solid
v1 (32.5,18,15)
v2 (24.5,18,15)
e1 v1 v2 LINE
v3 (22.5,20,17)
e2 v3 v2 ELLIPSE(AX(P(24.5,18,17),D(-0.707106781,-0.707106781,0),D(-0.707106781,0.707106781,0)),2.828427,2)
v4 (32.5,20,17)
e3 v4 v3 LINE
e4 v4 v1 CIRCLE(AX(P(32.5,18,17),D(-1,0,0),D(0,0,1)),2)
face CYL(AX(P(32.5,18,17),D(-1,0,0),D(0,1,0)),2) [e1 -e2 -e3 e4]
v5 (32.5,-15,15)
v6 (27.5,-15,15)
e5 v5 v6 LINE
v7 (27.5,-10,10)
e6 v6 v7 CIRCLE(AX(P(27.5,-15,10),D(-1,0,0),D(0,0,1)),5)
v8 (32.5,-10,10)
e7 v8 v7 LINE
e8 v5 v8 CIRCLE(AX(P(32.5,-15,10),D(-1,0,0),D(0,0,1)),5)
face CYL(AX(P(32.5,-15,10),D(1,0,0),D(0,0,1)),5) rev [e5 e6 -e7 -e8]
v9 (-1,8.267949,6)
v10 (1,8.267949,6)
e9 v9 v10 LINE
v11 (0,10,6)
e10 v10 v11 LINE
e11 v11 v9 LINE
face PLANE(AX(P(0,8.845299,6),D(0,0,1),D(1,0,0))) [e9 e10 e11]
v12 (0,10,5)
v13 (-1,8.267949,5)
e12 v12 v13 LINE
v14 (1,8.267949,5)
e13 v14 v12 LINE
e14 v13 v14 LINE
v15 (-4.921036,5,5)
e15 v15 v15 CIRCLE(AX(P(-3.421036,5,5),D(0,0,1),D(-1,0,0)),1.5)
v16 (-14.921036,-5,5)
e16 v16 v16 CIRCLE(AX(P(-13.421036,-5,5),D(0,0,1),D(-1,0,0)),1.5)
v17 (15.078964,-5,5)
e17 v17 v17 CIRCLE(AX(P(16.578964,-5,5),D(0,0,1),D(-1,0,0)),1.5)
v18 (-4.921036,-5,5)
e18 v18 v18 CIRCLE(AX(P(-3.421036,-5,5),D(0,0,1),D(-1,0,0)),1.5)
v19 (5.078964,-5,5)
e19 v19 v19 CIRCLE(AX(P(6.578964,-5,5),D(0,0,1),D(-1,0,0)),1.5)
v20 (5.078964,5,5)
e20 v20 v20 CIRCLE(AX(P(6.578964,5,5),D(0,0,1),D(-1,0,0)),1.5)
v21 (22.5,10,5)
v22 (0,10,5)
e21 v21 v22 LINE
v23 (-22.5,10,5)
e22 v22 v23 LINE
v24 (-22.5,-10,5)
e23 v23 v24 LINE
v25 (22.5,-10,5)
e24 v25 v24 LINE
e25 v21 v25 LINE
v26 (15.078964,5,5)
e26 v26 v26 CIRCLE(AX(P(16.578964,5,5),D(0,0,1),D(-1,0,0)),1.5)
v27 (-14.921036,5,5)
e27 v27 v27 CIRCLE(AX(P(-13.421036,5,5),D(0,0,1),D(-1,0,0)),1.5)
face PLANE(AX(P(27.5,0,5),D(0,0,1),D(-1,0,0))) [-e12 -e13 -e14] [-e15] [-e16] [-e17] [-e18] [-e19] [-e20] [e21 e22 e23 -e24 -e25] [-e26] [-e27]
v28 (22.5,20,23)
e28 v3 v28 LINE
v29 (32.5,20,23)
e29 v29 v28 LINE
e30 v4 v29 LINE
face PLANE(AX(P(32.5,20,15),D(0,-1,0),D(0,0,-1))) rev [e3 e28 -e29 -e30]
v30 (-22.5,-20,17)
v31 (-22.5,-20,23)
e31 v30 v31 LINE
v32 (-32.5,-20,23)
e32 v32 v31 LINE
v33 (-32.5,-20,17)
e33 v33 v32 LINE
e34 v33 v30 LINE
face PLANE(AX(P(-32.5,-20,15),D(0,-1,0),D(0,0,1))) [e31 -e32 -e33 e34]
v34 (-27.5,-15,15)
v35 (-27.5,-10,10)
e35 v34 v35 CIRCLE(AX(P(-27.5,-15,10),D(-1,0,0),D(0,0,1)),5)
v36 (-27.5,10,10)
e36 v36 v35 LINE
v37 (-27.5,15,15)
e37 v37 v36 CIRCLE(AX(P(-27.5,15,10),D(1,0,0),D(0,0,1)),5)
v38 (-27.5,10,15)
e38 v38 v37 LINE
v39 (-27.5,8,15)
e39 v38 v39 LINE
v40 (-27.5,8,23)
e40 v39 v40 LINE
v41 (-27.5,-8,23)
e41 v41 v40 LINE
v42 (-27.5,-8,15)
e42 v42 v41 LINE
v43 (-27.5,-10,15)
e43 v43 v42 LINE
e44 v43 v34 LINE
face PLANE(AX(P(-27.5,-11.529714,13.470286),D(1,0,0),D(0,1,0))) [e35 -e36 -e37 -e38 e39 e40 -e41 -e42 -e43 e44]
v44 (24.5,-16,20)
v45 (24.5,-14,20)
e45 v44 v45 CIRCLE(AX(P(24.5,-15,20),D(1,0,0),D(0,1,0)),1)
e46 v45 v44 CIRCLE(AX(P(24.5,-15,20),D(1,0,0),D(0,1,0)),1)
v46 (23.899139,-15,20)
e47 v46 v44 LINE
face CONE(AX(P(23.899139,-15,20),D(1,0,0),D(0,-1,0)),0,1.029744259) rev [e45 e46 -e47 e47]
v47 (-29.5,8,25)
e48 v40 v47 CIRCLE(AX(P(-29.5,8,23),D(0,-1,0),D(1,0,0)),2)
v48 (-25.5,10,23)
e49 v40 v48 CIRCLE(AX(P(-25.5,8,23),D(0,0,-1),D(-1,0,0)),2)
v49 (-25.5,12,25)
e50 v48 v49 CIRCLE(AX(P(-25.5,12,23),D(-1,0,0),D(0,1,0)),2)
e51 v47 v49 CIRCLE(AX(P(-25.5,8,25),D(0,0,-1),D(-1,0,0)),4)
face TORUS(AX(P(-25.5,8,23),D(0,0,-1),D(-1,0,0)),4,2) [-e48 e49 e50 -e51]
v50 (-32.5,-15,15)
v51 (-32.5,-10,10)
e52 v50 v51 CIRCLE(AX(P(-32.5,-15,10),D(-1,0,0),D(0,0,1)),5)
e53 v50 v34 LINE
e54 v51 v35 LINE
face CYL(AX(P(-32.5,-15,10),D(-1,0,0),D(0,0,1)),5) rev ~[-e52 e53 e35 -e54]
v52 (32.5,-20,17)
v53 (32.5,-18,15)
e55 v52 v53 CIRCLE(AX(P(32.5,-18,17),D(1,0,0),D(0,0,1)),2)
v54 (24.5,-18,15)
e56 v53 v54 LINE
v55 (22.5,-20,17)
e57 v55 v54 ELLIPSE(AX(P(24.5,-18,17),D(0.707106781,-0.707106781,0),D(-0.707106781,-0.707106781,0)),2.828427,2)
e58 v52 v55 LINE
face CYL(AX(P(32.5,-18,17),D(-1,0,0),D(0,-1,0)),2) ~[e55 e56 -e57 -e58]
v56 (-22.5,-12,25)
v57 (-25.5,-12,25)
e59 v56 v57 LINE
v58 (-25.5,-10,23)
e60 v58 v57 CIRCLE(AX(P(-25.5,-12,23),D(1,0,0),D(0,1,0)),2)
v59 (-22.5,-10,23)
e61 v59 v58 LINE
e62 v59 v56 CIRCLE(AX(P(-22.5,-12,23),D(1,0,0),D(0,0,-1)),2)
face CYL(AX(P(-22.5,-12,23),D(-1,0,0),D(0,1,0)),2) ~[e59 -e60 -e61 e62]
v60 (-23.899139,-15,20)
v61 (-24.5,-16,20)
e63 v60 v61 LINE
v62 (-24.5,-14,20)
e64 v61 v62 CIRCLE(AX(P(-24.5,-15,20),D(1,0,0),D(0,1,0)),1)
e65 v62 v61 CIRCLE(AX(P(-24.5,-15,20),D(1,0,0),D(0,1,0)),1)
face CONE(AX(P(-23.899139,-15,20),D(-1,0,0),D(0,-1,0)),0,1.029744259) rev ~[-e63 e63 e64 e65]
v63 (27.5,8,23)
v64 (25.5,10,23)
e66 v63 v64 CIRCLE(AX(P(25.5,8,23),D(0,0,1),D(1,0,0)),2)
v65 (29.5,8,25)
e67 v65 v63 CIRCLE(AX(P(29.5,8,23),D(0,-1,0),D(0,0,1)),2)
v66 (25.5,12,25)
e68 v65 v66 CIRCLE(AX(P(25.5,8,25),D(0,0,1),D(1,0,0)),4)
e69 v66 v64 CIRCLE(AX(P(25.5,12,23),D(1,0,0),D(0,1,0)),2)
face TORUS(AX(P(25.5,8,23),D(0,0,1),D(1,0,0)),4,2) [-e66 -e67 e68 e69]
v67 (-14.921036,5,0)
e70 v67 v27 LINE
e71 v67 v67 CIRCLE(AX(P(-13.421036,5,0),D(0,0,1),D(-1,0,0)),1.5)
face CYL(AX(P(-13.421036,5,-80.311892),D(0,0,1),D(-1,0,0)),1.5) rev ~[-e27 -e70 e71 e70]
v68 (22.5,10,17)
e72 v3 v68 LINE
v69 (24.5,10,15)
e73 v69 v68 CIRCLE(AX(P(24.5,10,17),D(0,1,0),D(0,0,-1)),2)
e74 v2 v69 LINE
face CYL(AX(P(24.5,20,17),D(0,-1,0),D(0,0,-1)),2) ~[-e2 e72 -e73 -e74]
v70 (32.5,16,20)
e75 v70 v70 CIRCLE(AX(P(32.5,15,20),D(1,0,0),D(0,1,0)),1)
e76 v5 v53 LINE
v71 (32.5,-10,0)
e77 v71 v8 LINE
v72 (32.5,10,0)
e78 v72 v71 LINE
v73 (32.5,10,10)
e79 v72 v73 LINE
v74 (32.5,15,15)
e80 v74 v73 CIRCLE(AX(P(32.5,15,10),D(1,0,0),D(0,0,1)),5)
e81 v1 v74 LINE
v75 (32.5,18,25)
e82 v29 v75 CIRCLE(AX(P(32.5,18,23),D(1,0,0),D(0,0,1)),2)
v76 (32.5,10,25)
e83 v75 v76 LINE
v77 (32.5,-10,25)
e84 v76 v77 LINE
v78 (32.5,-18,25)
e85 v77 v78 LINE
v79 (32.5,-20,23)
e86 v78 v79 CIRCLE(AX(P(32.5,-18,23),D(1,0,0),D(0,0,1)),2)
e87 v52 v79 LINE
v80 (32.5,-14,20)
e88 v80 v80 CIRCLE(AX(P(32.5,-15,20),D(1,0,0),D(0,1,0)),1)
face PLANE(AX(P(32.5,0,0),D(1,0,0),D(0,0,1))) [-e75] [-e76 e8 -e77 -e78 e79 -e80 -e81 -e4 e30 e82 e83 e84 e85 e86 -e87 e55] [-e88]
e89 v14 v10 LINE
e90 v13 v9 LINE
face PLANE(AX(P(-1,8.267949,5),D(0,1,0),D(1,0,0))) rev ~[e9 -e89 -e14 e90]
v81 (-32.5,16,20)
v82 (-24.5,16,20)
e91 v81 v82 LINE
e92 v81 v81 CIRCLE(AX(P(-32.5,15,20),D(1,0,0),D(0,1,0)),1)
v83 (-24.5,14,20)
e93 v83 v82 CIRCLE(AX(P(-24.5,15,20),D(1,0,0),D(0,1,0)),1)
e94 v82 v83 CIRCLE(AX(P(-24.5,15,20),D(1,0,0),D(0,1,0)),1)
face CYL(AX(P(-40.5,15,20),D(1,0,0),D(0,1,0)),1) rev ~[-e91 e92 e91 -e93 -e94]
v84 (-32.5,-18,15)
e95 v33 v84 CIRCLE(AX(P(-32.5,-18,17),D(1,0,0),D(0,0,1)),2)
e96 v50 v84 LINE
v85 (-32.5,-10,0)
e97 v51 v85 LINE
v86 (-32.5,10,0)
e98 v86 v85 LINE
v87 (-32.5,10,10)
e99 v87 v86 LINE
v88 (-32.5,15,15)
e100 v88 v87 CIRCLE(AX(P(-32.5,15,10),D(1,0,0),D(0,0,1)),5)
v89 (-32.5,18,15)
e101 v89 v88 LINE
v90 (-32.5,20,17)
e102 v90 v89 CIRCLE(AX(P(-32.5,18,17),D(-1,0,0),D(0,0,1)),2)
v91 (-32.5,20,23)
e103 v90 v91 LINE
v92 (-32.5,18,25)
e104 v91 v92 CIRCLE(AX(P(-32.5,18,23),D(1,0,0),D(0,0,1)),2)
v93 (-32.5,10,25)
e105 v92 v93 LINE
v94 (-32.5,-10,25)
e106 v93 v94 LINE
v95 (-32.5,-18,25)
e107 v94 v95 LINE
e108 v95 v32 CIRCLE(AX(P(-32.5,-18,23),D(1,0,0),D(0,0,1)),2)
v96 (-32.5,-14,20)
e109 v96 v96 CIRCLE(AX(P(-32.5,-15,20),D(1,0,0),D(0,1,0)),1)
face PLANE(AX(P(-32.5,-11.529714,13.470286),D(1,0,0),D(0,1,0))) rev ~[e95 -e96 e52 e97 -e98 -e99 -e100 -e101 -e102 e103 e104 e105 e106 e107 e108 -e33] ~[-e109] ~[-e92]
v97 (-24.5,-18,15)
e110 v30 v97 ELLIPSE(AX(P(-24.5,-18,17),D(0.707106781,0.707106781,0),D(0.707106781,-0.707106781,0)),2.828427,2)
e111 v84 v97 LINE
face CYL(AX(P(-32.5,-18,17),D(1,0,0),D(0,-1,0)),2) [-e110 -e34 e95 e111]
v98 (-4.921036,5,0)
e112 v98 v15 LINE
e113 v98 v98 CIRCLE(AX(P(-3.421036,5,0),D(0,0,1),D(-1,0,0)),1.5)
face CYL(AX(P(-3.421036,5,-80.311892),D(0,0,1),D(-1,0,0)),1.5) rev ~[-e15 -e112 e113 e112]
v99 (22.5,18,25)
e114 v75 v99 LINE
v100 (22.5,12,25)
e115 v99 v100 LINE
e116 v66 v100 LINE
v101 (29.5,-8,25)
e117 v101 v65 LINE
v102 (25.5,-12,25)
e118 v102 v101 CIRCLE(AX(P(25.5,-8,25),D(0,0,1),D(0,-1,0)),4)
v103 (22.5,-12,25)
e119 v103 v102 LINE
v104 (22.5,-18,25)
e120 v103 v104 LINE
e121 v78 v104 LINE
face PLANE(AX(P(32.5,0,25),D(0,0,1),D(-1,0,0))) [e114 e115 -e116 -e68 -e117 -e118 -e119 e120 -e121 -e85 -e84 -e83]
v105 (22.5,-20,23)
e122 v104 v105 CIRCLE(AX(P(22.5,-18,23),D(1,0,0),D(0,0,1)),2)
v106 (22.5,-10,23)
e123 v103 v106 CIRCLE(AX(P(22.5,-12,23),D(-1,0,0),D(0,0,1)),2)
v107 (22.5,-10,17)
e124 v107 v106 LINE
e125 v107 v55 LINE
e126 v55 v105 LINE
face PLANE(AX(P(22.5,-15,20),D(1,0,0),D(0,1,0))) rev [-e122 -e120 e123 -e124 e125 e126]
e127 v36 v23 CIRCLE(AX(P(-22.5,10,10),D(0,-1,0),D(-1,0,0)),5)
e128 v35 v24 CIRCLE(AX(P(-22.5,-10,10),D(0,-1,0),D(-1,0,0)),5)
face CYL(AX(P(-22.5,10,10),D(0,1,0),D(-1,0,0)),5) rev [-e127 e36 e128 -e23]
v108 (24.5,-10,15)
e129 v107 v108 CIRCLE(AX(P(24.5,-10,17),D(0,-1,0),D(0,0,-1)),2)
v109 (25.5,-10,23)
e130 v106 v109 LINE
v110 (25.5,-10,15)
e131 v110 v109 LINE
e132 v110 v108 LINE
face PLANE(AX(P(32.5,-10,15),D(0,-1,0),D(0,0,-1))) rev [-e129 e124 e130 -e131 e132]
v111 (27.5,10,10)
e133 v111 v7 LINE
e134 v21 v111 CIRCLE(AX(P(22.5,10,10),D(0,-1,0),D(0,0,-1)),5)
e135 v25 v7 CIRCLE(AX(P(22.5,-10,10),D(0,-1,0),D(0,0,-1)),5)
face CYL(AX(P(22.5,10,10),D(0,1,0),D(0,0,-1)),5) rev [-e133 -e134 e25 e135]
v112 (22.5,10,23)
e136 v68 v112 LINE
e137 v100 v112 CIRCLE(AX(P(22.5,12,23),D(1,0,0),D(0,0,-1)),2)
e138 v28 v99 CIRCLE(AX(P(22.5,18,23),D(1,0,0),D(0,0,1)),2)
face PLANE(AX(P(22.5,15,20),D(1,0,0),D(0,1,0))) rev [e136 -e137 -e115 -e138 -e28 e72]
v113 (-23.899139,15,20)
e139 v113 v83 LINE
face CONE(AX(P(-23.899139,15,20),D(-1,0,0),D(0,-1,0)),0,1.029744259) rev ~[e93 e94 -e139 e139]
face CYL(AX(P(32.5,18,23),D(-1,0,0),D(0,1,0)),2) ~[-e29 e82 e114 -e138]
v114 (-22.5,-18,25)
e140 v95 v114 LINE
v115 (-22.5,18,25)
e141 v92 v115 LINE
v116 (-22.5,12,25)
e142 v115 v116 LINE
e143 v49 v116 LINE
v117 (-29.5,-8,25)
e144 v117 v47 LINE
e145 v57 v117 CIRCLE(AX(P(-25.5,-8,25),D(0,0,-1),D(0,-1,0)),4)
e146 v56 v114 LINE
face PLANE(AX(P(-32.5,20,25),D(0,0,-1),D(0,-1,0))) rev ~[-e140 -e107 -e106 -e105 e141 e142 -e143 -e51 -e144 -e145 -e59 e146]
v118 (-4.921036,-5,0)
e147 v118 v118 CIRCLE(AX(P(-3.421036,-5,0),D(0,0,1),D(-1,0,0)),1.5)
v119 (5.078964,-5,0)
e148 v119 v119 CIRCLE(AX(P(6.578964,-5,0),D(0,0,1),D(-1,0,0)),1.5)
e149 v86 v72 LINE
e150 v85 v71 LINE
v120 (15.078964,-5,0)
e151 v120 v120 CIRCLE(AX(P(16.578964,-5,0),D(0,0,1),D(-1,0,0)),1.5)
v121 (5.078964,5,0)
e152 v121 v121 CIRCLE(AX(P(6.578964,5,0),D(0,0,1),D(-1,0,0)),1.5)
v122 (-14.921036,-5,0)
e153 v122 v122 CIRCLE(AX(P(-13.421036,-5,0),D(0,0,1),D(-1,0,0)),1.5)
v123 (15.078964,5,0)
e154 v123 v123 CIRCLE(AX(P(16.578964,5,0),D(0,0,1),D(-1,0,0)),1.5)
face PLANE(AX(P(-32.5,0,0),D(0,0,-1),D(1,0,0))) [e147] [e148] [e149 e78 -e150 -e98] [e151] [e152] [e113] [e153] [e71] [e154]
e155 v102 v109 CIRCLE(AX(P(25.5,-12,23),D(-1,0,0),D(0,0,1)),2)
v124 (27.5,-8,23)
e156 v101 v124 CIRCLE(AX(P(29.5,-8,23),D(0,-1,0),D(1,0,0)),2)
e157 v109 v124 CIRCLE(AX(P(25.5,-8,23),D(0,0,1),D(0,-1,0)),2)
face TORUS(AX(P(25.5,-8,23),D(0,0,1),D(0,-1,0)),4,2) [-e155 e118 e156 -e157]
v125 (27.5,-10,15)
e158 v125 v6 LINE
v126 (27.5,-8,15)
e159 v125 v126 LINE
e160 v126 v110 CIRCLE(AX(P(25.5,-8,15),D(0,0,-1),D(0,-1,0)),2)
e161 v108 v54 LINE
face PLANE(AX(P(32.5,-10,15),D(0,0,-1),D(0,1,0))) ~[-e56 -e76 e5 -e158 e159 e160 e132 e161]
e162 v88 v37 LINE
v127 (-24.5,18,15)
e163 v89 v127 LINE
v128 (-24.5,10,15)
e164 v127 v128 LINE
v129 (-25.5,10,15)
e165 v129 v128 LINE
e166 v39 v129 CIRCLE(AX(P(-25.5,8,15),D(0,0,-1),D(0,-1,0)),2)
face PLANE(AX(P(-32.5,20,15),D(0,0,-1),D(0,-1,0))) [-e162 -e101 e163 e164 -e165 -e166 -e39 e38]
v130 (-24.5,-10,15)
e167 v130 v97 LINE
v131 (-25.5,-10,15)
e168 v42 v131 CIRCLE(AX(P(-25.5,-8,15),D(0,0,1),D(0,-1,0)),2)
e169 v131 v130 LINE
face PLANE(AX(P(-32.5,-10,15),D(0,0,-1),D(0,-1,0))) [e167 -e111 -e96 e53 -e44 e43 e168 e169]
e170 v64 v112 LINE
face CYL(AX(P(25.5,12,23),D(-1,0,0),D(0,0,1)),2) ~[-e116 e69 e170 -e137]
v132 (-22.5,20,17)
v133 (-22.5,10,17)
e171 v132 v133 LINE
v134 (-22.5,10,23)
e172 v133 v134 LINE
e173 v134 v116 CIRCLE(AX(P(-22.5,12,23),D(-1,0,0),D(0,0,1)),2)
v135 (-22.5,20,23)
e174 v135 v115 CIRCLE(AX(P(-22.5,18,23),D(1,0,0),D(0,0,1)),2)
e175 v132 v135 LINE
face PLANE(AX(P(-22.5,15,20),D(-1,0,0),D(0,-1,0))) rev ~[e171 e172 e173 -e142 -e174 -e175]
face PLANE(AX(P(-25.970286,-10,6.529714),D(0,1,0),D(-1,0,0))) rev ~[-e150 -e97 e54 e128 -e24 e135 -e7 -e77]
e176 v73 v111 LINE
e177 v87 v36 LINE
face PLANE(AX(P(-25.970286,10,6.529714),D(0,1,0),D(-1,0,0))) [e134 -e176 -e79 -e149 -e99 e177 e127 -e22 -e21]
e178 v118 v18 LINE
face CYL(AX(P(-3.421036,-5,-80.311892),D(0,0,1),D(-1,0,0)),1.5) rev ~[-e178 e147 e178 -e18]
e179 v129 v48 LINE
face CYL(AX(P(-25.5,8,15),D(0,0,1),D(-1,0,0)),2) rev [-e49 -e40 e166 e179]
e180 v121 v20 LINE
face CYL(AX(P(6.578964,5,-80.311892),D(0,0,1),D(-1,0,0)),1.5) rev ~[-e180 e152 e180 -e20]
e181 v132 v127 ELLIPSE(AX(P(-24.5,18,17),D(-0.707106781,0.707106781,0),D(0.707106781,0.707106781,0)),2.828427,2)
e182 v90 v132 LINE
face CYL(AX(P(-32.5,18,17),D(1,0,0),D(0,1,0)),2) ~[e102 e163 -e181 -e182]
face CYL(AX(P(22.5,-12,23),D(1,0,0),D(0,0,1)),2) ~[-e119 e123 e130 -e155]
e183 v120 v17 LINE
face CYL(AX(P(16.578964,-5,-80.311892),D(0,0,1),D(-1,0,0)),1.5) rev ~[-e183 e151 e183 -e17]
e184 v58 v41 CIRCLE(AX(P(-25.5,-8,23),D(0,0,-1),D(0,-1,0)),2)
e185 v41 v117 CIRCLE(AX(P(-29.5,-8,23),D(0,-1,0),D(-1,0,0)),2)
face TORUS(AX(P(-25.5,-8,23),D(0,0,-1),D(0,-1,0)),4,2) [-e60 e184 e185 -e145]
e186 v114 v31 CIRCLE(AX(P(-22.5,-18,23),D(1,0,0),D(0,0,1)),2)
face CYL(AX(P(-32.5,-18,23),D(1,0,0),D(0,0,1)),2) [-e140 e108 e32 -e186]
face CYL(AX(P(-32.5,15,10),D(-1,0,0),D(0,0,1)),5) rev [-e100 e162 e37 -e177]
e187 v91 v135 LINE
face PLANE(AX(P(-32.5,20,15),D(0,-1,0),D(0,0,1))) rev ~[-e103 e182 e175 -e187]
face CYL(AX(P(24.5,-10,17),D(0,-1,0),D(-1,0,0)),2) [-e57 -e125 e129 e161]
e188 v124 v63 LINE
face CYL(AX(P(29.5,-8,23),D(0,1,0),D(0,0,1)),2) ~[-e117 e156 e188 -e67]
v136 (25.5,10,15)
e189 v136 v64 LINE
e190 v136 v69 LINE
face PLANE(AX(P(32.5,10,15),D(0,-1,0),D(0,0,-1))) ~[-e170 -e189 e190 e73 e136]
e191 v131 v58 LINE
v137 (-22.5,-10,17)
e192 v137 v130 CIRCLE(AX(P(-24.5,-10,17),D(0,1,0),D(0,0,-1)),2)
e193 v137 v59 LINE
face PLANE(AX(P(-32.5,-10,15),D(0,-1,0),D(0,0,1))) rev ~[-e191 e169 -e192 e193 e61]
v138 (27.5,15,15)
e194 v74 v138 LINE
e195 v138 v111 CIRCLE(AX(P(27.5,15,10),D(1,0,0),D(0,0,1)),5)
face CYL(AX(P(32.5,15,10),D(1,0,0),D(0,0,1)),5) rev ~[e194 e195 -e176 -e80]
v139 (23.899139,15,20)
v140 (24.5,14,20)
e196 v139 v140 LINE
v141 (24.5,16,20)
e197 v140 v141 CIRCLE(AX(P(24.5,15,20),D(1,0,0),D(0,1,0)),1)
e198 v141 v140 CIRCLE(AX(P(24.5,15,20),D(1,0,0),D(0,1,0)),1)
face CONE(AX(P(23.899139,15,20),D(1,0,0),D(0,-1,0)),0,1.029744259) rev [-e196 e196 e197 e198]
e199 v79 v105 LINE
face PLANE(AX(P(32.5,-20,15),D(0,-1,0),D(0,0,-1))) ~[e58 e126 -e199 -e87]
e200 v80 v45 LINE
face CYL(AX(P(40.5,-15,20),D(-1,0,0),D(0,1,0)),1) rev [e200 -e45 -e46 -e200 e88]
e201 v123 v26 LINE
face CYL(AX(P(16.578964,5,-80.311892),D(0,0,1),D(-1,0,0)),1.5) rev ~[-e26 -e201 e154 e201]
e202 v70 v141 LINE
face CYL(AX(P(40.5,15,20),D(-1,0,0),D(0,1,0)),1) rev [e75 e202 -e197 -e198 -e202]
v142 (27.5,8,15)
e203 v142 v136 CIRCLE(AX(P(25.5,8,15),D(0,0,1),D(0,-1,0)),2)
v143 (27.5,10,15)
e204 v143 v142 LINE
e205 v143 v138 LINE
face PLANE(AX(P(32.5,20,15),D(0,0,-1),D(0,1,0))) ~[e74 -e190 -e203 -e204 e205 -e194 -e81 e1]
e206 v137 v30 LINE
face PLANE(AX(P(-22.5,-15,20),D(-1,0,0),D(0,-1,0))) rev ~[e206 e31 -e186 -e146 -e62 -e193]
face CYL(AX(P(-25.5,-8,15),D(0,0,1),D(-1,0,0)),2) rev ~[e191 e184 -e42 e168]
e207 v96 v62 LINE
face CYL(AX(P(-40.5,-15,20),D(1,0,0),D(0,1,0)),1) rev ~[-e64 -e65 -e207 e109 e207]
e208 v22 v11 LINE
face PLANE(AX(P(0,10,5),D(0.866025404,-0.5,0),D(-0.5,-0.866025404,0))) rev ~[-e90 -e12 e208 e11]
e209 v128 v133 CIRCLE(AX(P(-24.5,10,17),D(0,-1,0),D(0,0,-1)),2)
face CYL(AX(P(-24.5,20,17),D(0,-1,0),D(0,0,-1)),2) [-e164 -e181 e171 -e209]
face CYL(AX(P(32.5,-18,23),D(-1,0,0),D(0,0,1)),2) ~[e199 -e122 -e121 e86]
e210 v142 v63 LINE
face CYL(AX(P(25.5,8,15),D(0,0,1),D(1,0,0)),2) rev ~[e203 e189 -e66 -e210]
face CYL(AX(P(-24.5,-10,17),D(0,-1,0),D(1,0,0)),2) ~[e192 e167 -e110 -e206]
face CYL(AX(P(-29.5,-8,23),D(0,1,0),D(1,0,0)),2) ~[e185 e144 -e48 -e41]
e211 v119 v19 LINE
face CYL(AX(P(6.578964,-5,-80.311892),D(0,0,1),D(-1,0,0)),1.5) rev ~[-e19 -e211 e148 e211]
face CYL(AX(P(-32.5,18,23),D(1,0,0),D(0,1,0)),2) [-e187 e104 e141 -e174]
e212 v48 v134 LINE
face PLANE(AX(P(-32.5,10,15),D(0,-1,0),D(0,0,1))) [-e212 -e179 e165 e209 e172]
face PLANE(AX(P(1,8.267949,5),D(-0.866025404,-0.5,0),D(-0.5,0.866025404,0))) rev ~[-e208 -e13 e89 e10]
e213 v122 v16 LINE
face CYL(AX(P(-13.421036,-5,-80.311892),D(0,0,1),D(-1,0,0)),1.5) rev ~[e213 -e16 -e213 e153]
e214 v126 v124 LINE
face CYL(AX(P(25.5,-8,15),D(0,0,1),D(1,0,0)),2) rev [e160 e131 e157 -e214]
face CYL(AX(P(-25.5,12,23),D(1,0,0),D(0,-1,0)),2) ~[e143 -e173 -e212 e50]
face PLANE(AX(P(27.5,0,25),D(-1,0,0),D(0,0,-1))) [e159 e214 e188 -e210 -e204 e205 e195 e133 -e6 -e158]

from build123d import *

# Parameters (mm, degrees)
F1_DEPTH    = 10
F4_DEPTH    = 1
F5_W        = 10
F5_H        = 10.0000003353
F6_DEPTH    = 10
F7_D        = 2
F7_DEPTH    = 8
F7_TIP      = 0.600860619
F8_R        = 2
F9_T1_DEPTH = 5
F9_T3_DEPTH = 20
F10_R       = 2
F12_D       = 3
F13_R       = 2


# Not quite as in the source:
# - a fillet or chamfer that OpenCascade refuses, or shapes differently, is made with other operations: its cross-section is extruded or revolved along the edge and cut away or added


with BuildPart() as f1:
    # F0 (on Front) → F1 (new body, symmetric)
    with BuildSketch(Plane.XZ):
        Polygon((-27.5, 25), (-32.5, 25), (-32.5, 0), (32.5, 0), (32.5, 25), (27.5, 25), (27.5, 5), (-27.5, 5), align=None)
    extrude(amount=F1_DEPTH, both=True)

    # F3 (on face) → F4 (join)
    with BuildSketch(Plane.XY.offset(5)):
        Polygon((1, 8.2679491924), (0, 10), (-1, 8.2679491924), align=None)
    extrude(amount=F4_DEPTH)

    # F5 (on face) → F6 (join)
    with BuildSketch(Plane(origin=(-32.5, 0, 0), x_dir=(0, -1, 0), z_dir=(-1, 0, 0))):
        with Locations((-15, 19.9999998324)):
            Rectangle(F5_W, F5_H)
        with Locations((15, 19.9999998324)):
            Rectangle(F5_W, F5_H)
    extrude(amount=-F6_DEPTH)

    # F7
    with Locations(Plane(origin=(-32.5, 0, 0), x_dir=(0, -1, 0), z_dir=(-1, 0, 0))):
        with Locations((-15, 19.9999998324), (15, 19.9999998324)):
            Hole(F7_D / 2, depth=F7_DEPTH)
            with Locations((0, 0, -(F7_DEPTH + F7_TIP / 2))):  # 118° drill point
                Cone(0, F7_D / 2, F7_TIP, mode=Mode.SUBTRACT)

    # F8
    f8_edges = [f1.edges().sort_by_distance(p)[0] for p in [
        (-27.5, -20, 25),
        (-27.5, 20, 25),
        (-27.5, 20, 15),
        (-22.5, 15, 15),
        (-22.5, -15, 15),
        (-27.5, -20, 15),
    ]]
    fillet(f8_edges, radius=F8_R)

    # F9: fillet of radius 5 on 4 edges, made by hand

    # F9_s2 → F9_t1 (join)
    with BuildSketch(Plane.YZ.offset(-32.5)):
        with BuildLine():
            ThreePointArc((-15, 14.9999996647), (-11.4644660941, 13.5355335707), (-10, 9.9999996647))
            Line((-10, 9.9999996647), (-10, 14.9999996647))
            Line((-10, 14.9999996647), (-15, 14.9999996647))
        make_face()
        with BuildLine():
            ThreePointArc((15, 14.9999996647), (11.4644660941, 13.5355335707), (10, 9.9999996647))
            Line((10, 9.9999996647), (10, 14.9999996647))
            Line((10, 14.9999996647), (15, 14.9999996647))
        make_face()
    extrude(amount=F9_T1_DEPTH)

    # F9_s4 → F9_t3 (join)
    with BuildSketch(Plane.XZ.offset(-10)):
        with BuildLine():
            ThreePointArc((-27.5, 10), (-26.0355339059, 6.4644660941), (-22.5, 5))
            Line((-22.5, 5), (-27.5, 5))
            Line((-27.5, 5), (-27.5, 10))
        make_face()
        with BuildLine():
            ThreePointArc((22.5, 5), (26.0355339059, 6.4644660941), (27.5, 10))
            Line((27.5, 10), (27.5, 5))
            Line((27.5, 5), (22.5, 5))
        make_face()
    extrude(amount=F9_T3_DEPTH)

    # F10
    f10_edges = [f1.edges().sort_by_distance(p)[0] for p in [
        (-27.5, 10, 20),
        (-27.5, -10, 20),
    ]]
    fillet(f10_edges, radius=F10_R)

    # F11: F1 across plane


with BuildPart() as f1_1:
    add(f1.part)
    add(f1.part.mirror(Plane.YZ))

    # F12 (through all)
    with Locations(Plane(origin=(0, 0, 0), x_dir=(1, 0, 0), z_dir=(0, 0, -1))):
        with Locations((-13.4210362619, 5.0000001118), (-3.4210362619, 5.0000001118), (6.5789637381, 5.0000001118), (16.5789637381, 5.0000001118), (-13.4210362619, -4.9999998882), (-3.4210362619, -4.9999998882), (6.5789637381, -4.9999998882), (16.5789637381, -4.9999998882)):
            Hole(F12_D / 2)

    # F13
    f13_edges = [f1_1.edges().sort_by_distance(p)[0] for p in [
        (-27.5, 0, 25),
        (27.5, 0, 25),
        (-24, -10, 25),
        (-26.914214, -9.414214, 25),
        (-26.914214, 9.414214, 25),
        (-24, 10, 25),
        (24, 10, 25),
        (26.914214, 9.414214, 25),
        (26.914214, -9.414214, 25),
        (24, -10, 25),
    ]]
    fillet(f13_edges, radius=F13_R)


solid = f1_1.part
